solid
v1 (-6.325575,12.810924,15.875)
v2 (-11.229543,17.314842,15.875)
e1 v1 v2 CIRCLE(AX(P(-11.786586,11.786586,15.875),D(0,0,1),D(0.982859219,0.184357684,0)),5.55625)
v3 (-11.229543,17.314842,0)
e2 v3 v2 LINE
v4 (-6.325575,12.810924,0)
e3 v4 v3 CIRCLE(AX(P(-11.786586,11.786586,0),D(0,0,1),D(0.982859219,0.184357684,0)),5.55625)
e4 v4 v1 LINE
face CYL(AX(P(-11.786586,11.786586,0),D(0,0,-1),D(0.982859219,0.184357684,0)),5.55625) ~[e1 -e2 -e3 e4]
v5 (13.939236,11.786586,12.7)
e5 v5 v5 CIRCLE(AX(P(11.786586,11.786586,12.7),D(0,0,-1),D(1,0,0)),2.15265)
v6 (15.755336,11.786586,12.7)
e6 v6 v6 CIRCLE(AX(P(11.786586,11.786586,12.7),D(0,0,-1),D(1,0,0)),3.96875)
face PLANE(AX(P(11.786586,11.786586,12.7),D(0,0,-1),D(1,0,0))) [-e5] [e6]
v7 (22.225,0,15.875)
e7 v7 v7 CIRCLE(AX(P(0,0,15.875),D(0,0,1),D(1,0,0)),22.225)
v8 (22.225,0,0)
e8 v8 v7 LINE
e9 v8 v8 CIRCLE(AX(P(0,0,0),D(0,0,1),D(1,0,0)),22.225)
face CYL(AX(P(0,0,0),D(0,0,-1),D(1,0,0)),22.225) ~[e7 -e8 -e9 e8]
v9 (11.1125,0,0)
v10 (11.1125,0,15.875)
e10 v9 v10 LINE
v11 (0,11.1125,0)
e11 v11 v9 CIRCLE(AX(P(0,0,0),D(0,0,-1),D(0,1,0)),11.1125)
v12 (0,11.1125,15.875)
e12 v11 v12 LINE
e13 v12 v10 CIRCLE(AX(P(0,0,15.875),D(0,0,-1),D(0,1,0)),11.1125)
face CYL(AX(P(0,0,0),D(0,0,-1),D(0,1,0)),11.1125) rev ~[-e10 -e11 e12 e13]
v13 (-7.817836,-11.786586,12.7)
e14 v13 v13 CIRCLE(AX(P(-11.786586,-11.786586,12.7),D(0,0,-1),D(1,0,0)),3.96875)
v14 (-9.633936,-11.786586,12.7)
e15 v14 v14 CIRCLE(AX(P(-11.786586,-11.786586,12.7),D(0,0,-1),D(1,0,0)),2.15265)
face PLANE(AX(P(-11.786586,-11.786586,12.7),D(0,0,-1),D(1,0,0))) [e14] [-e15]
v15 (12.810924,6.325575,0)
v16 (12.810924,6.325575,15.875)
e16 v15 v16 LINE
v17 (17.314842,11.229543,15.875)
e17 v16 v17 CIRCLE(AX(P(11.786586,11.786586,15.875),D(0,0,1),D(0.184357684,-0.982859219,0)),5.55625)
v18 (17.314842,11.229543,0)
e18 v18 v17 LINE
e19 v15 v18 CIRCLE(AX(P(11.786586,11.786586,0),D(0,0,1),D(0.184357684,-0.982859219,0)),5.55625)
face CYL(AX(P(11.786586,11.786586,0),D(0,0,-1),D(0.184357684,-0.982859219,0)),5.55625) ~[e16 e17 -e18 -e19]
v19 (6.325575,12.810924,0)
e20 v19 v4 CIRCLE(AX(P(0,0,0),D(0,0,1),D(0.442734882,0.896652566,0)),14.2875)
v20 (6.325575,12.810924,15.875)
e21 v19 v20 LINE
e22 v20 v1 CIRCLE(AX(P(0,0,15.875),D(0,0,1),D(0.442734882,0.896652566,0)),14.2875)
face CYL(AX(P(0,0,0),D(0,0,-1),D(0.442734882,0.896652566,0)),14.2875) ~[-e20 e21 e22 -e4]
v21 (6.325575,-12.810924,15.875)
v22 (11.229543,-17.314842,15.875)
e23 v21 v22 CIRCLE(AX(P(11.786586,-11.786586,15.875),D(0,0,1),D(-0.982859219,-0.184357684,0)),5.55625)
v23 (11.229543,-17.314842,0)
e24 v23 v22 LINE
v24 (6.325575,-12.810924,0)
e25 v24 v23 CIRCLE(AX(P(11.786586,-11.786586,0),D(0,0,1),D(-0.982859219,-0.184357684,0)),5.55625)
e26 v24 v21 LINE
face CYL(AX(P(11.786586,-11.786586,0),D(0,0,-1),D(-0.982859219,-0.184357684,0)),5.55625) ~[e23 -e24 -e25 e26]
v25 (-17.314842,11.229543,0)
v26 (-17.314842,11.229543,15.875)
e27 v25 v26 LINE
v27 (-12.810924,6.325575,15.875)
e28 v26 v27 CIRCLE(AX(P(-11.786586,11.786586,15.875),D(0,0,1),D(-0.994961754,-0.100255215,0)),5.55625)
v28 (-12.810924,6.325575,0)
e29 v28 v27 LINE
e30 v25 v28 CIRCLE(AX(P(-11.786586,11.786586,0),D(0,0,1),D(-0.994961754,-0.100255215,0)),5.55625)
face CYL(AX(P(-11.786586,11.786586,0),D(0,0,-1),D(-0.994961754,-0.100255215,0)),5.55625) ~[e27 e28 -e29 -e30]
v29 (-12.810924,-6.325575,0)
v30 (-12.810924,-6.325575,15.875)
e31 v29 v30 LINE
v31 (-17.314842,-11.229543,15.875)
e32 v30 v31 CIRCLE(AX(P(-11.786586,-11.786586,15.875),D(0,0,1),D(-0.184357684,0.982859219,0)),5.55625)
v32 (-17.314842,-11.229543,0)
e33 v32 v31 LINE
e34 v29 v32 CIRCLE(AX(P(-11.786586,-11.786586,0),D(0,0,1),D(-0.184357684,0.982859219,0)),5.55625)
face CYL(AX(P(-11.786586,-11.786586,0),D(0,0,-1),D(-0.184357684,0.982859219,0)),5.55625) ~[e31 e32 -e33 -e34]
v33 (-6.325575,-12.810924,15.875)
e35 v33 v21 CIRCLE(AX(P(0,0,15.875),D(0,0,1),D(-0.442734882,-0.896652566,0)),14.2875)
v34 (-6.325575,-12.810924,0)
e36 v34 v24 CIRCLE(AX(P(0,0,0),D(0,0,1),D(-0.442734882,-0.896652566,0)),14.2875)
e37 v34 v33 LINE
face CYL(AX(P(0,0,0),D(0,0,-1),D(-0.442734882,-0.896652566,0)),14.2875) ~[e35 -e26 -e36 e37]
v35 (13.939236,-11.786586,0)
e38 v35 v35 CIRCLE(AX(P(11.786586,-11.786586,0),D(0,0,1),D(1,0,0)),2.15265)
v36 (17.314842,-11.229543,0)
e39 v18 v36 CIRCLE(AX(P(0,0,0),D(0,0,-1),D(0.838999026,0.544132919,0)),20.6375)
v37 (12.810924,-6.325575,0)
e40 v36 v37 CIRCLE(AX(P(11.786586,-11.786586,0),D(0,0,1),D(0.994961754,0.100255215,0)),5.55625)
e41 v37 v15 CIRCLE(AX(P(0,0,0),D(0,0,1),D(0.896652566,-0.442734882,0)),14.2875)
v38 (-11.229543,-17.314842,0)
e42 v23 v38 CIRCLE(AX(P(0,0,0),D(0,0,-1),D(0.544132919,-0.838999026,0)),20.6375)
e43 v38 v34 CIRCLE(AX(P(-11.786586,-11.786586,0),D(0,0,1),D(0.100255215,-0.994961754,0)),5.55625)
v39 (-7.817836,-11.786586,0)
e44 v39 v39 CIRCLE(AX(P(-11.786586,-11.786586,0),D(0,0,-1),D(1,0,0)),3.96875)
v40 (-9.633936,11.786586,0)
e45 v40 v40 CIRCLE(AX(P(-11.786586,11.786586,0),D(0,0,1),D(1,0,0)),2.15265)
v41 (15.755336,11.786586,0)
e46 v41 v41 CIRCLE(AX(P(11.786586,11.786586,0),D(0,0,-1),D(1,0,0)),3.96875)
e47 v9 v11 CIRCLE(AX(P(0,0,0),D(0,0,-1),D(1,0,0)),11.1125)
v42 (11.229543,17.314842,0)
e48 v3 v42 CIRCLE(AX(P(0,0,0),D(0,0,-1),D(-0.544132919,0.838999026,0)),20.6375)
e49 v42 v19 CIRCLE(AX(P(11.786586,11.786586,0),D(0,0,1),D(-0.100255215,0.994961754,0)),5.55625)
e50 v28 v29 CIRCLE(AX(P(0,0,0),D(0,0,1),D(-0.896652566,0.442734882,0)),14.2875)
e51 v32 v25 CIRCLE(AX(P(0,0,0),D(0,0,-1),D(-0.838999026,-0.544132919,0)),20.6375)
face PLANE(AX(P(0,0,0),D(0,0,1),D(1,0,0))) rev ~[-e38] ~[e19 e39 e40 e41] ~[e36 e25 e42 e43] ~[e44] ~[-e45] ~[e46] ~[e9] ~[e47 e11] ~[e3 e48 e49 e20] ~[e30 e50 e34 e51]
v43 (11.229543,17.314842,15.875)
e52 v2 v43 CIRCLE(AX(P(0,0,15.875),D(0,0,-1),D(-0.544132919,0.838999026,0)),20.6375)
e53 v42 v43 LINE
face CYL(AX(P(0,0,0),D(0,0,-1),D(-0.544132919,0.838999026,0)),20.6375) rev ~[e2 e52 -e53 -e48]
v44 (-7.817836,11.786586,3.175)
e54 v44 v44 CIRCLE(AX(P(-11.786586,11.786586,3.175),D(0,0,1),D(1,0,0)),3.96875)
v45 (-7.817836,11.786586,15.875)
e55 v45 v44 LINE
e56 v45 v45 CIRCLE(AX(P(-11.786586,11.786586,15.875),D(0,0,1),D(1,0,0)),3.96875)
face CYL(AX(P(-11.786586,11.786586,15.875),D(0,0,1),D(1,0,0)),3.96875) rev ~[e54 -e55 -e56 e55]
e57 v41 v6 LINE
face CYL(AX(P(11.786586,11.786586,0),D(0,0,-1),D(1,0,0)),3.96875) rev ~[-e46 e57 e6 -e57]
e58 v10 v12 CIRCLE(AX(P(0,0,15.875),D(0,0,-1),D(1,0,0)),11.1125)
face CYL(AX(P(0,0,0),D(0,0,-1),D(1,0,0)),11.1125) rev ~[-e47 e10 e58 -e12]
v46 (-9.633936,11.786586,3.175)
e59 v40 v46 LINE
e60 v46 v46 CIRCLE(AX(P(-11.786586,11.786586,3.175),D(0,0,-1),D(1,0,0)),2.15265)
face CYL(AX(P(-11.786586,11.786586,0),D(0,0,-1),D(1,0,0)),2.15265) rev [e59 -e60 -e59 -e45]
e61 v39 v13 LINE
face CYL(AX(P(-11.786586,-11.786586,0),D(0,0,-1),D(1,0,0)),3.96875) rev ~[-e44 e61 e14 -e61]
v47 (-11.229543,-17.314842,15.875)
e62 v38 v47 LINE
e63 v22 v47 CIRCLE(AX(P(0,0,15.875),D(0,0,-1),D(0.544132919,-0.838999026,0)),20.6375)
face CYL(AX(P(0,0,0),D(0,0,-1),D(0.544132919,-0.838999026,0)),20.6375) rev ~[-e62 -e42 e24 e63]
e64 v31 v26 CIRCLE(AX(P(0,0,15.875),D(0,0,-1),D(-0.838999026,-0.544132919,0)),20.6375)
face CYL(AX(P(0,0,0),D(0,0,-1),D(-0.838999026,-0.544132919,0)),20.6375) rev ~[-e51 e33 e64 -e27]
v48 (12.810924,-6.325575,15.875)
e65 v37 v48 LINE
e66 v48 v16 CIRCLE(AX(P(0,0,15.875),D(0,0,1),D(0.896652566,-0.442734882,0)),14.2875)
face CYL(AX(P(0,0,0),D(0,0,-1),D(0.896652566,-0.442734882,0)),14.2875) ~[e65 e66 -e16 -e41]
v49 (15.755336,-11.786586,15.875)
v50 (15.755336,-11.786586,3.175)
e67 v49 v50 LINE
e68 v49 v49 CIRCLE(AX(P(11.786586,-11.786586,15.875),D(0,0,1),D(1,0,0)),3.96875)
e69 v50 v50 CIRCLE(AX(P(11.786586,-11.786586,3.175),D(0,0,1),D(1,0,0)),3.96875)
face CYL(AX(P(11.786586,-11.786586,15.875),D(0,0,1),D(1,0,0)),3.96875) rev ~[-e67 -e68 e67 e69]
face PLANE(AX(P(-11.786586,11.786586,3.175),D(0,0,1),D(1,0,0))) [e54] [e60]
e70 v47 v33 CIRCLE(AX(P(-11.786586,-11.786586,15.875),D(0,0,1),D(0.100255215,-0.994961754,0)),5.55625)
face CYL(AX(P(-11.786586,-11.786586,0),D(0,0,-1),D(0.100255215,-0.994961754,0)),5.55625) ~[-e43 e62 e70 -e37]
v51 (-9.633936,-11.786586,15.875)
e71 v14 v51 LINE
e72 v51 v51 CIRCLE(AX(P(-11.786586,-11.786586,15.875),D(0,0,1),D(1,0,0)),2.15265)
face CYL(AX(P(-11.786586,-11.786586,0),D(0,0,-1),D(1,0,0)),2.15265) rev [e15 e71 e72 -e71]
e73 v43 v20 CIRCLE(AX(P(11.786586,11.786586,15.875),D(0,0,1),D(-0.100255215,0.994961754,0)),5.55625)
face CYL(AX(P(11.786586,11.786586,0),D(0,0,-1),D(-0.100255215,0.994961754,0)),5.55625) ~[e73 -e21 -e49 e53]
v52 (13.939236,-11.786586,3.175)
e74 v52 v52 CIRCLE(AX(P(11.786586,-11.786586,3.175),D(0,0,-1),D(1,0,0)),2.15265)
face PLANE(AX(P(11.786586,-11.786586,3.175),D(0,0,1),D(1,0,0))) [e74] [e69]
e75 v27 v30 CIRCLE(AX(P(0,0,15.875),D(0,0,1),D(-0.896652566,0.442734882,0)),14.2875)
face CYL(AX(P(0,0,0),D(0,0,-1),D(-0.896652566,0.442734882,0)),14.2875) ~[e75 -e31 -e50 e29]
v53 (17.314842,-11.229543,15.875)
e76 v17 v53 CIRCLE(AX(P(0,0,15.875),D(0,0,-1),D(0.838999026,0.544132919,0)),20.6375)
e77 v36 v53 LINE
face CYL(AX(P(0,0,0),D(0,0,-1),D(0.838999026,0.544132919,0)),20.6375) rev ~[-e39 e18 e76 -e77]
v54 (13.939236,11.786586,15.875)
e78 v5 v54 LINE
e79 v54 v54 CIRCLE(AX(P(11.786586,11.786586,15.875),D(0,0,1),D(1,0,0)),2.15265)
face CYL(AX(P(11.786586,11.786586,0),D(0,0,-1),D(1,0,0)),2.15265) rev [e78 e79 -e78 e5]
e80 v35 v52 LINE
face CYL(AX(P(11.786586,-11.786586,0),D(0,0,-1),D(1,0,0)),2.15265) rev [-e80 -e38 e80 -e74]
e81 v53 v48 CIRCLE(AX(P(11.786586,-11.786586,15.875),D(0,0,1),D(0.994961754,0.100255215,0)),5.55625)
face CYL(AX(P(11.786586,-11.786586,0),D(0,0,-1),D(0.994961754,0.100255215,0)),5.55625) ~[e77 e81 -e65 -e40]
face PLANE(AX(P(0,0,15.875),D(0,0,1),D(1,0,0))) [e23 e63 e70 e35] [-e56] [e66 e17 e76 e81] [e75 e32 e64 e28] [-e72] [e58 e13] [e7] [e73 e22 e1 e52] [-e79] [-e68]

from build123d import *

# Parameters (mm, degrees)
F0_R            = 22.225
F0_R_2          = 2.15265
F1_DEPTH        = 15.875
F4_R            = 3.96875
F5_DEPTH        = 12.7
F6_R            = 3.96875
F7_DEPTH        = 12.7
F9_DEPTH        = 15.875
F9_COPIES_COUNT = 4


# Not quite as in the source:
# - a pattern or mirror of a feature is missing from the dataset's text; its kind, count and spacing are read off the source's solid


with BuildPart() as f1:
    # F0 (on Top) → F1 (new body)
    with BuildSketch(Plane.XY):
        Circle(F0_R)
        with Locations((-11.7865861589, -11.7865861589)):
            Circle(F0_R_2, mode=Mode.SUBTRACT)
        with Locations((11.7865861589, -11.7865861589)):
            Circle(F0_R_2, mode=Mode.SUBTRACT)
        with Locations((-11.7865861589, 11.7865861589)):
            Circle(F0_R_2, mode=Mode.SUBTRACT)
        with BuildLine():
            ThreePointArc((0, 11.1125), (7.8577241059, 7.8577241059), (11.1125, 0))
            ThreePointArc((11.1125, 0), (-7.8577241059, -7.8577241059), (0, 11.1125))
        make_face(mode=Mode.SUBTRACT)
        with Locations((11.7865861589, 11.7865861589)):
            Circle(F0_R_2, mode=Mode.SUBTRACT)
    extrude(amount=F1_DEPTH)

    # F4 (on face) → F5 (cut, through all)
    with BuildSketch(Plane(origin=(0, 0, 0), x_dir=(1, 0, 0), z_dir=(0, 0, -1))):
        with Locations((11.7865861589, -11.7865861589)):
            Circle(F4_R)
        with Locations((-11.7865861589, 11.7865861589)):
            Circle(F4_R)
    extrude(amount=-F5_DEPTH, mode=Mode.SUBTRACT)

    # F6 (on face) → F7 (cut, through all)
    with BuildSketch(Plane.XY.offset(15.875)):
        with Locations((-11.7865861589, 11.7865861589)):
            Circle(F6_R)
        with Locations((11.7865861589, -11.7865861589)):
            Circle(F6_R)
    extrude(amount=-F7_DEPTH, mode=Mode.SUBTRACT)

    # F8 (on face) → F9 (cut, through all)
    with BuildSketch(Plane(origin=(0, 0, 0), x_dir=(1, 0, 0), z_dir=(0, 0, -1))):
        with BuildLine():
            ThreePointArc((-11.229543123, 17.3148424047), (-8.0281867, 15.8788163052), (-6.3255746232, 12.8109235396))
            ThreePointArc((-6.3255746232, 12.8109235396), (0, 14.2875), (6.3255746232, 12.8109235396))
            ThreePointArc((6.3255746232, 12.8109235396), (8.0281867, 15.8788163052), (11.229543123, 17.3148424047))
            ThreePointArc((11.229543123, 17.3148424047), (0, 20.6375), (-11.229543123, 17.3148424047))
        make_face()
    f9 = extrude(amount=-F9_DEPTH, mode=Mode.SUBTRACT)

    # F9_copies: F9 ×4 about axis
    f9_copies_axis = Axis((0, 0, 0), (0, 0, 1))
    for i in range(1, F9_COPIES_COUNT):
        add(f9.rotate(f9_copies_axis, i * 360 / F9_COPIES_COUNT), mode=Mode.SUBTRACT)


solid = f1.part
